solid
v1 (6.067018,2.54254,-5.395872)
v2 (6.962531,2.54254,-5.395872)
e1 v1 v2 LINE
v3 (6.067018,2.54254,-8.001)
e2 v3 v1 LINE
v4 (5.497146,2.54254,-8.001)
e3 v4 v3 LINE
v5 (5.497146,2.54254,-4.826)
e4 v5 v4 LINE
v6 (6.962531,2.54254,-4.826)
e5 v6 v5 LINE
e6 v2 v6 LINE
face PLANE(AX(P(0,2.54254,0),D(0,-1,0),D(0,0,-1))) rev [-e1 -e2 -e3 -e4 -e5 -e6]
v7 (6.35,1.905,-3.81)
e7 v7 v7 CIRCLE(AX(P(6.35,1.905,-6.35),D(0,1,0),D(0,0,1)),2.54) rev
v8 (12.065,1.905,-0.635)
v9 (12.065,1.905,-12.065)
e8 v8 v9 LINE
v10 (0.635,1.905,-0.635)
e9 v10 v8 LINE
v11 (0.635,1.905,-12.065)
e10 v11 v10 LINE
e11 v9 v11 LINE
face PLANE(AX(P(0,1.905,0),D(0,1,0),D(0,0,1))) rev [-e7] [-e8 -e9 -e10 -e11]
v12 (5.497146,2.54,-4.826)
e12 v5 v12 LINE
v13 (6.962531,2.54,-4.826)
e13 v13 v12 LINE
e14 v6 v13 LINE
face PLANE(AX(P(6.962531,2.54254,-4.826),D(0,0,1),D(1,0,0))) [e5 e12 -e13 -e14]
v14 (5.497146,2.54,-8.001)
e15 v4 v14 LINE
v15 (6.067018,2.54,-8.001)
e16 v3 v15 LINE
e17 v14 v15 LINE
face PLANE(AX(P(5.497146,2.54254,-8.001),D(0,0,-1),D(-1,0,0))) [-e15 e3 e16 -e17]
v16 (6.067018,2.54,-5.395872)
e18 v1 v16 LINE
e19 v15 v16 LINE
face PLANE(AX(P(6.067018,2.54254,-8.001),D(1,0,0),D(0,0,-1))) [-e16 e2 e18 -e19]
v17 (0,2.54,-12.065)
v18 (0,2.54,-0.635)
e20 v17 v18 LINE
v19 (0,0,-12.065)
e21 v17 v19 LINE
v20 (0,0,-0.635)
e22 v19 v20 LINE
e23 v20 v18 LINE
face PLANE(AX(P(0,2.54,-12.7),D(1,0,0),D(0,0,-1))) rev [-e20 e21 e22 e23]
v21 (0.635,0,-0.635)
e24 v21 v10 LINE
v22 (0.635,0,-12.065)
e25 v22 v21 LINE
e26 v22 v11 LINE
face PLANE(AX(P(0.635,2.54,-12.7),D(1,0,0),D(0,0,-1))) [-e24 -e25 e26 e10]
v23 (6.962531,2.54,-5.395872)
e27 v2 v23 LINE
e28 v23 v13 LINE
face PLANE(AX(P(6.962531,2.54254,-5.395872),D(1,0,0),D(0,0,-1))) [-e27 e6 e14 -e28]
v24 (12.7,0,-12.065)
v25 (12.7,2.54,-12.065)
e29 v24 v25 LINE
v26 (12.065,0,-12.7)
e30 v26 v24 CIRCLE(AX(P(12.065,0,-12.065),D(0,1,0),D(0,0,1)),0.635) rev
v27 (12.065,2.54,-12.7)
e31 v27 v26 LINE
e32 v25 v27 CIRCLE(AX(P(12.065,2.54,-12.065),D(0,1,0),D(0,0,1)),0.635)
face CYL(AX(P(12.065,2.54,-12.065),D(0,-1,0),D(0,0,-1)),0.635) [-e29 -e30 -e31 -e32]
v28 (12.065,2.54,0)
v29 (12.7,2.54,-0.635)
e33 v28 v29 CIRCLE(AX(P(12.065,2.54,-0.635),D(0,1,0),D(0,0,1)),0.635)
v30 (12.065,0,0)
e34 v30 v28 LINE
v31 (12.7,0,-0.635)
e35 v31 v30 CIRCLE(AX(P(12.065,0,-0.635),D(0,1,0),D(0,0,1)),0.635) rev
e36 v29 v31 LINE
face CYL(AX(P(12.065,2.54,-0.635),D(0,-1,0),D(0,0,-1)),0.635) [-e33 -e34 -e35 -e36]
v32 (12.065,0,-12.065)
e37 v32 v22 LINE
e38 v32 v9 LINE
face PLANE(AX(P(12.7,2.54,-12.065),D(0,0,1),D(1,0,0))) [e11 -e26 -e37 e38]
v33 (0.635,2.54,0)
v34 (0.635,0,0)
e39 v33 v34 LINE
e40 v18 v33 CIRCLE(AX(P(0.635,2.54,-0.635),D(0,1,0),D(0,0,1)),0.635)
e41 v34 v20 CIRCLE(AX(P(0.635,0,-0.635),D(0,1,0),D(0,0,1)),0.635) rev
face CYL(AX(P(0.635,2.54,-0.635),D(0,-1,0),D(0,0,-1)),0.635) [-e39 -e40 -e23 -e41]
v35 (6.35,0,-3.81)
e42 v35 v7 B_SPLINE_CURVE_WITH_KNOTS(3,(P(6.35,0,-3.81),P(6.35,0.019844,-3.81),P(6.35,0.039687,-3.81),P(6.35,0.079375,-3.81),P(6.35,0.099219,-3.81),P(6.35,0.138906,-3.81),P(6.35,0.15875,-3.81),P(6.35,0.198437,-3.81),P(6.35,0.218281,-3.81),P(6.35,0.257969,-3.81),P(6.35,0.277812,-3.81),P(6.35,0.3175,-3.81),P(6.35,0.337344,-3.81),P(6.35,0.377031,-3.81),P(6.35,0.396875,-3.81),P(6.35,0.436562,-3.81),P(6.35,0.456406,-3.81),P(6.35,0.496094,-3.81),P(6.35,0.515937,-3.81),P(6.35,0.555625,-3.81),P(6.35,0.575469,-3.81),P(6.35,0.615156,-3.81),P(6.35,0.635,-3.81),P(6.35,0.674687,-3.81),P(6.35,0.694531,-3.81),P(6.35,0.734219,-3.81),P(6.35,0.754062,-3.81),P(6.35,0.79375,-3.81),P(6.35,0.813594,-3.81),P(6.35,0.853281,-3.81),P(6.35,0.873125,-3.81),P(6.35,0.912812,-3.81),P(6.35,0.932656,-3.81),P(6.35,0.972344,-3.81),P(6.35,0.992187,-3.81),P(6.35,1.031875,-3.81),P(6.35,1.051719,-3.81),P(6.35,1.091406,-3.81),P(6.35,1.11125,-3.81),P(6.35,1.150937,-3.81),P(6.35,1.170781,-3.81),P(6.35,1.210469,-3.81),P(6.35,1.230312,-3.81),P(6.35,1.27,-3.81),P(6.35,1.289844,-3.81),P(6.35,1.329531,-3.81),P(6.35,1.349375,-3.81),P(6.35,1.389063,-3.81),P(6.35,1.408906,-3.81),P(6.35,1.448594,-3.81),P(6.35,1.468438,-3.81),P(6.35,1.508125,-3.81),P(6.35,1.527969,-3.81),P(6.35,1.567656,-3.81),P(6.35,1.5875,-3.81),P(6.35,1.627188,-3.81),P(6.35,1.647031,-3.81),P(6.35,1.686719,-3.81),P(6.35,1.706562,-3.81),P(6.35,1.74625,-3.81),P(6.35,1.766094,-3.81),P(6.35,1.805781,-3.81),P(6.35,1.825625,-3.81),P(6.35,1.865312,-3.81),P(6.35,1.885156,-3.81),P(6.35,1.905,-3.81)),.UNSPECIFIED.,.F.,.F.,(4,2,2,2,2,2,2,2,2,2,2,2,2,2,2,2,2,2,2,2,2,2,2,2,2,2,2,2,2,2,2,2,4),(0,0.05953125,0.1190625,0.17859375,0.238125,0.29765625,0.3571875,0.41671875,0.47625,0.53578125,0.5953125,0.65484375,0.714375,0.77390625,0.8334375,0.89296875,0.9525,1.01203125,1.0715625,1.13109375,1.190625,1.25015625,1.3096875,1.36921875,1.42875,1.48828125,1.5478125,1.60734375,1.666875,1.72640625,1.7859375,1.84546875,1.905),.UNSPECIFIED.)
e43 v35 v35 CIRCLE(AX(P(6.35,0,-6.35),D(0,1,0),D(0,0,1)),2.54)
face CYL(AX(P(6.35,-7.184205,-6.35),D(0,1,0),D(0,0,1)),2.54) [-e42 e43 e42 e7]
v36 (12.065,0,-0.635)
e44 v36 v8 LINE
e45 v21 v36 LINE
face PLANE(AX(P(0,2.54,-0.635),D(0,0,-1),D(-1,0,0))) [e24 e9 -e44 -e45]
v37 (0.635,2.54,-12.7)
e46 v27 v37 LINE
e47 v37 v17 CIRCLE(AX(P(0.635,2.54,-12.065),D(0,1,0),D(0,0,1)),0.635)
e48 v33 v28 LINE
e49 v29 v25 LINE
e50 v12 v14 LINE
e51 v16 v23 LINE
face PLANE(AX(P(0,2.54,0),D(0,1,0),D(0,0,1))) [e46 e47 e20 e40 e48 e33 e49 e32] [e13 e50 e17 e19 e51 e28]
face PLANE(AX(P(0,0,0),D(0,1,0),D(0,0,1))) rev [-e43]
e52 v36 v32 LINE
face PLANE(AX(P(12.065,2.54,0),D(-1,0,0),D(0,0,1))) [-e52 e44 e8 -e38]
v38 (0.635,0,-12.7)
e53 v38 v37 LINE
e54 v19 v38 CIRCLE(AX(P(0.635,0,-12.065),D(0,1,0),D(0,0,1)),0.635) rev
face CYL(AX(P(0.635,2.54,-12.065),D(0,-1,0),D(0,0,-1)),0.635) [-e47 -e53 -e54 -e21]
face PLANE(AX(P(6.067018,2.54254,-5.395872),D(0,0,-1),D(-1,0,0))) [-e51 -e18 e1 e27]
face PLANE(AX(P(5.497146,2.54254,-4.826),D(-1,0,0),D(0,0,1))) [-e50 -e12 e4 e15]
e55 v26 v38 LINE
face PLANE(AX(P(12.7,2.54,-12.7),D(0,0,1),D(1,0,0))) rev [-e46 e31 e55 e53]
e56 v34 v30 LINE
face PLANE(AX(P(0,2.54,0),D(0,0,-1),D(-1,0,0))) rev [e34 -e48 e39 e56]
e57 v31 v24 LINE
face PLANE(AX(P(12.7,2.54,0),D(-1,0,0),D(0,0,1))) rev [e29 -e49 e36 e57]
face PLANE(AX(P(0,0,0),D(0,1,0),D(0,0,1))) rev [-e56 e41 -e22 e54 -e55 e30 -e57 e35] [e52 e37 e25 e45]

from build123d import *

# Parameters (mm, degrees)
SKETCH1_W           = 12.7
SKETCH1_H           = 12.7
BOSS_EXTRUDE1_DEPTH = 2.54
FILLET1_R           = 0.635
SHELL1_START        = 0.635
SHELL1_OUTLINE_W    = 1.905
SHELL1_OUTLINE_H    = 11.43
SHELL1_DEPTH        = 11.43
SKETCH2_R           = 2.54
BOSS_EXTRUDE2_DEPTH = 1.905
BOSS_EXTRUDE3_DEPTH = 0.00254


# Read off the part's stored shape, not the designer's step: Shell1
with BuildPart() as part:
    # Sketch1 → Boss-Extrude1 (new body)
    with BuildSketch(Plane(origin=(0, 0, 0), x_dir=(1, 0, 0), z_dir=(0, 1, 0))):
        with Locations((6.35, 6.35)):
            Rectangle(SKETCH1_W, SKETCH1_H)
    extrude(amount=BOSS_EXTRUDE1_DEPTH)

    # Fillet1
    fillet1_edges = [part.edges().sort_by_distance(p)[0] for p in [
        (0, 1.27, -12.7),
        (12.7, 1.27, -12.7),
        (12.7, 1.27, 0),
        (0, 1.27, 0),
    ]]
    fillet(fillet1_edges, radius=FILLET1_R)

    # Shell1 outline → Shell1 (cut)
    with BuildSketch(Plane.YZ.offset(SHELL1_START)):
        with Locations((0.9525, -6.35)):
            Rectangle(SHELL1_OUTLINE_W, SHELL1_OUTLINE_H)
    extrude(amount=SHELL1_DEPTH, mode=Mode.SUBTRACT)

    # Sketch2 → Boss-Extrude2 (add)
    with BuildSketch(Plane(origin=(0, 1.905, 0), x_dir=(-1, 0, 0), z_dir=(0, -1, 0))):
        with Locations(Location((-6.35, 6.35, 0), (0, 0, 270))):
            Circle(SKETCH2_R)
    extrude(amount=BOSS_EXTRUDE2_DEPTH)

    # Sketch3 → Boss-Extrude3 (add)
    with BuildSketch(Plane(origin=(0, 2.54, 0), x_dir=(1, 0, 0), z_dir=(0, 1, 0))):
        Polygon((5.497146154, 8.001), (6.067017949, 8.001), (6.067017949, 5.395871795), (6.962530769, 5.395871795), (6.962530769, 4.826), (5.497146154, 4.826), align=None)
    extrude(amount=BOSS_EXTRUDE3_DEPTH)


solid = part.part
